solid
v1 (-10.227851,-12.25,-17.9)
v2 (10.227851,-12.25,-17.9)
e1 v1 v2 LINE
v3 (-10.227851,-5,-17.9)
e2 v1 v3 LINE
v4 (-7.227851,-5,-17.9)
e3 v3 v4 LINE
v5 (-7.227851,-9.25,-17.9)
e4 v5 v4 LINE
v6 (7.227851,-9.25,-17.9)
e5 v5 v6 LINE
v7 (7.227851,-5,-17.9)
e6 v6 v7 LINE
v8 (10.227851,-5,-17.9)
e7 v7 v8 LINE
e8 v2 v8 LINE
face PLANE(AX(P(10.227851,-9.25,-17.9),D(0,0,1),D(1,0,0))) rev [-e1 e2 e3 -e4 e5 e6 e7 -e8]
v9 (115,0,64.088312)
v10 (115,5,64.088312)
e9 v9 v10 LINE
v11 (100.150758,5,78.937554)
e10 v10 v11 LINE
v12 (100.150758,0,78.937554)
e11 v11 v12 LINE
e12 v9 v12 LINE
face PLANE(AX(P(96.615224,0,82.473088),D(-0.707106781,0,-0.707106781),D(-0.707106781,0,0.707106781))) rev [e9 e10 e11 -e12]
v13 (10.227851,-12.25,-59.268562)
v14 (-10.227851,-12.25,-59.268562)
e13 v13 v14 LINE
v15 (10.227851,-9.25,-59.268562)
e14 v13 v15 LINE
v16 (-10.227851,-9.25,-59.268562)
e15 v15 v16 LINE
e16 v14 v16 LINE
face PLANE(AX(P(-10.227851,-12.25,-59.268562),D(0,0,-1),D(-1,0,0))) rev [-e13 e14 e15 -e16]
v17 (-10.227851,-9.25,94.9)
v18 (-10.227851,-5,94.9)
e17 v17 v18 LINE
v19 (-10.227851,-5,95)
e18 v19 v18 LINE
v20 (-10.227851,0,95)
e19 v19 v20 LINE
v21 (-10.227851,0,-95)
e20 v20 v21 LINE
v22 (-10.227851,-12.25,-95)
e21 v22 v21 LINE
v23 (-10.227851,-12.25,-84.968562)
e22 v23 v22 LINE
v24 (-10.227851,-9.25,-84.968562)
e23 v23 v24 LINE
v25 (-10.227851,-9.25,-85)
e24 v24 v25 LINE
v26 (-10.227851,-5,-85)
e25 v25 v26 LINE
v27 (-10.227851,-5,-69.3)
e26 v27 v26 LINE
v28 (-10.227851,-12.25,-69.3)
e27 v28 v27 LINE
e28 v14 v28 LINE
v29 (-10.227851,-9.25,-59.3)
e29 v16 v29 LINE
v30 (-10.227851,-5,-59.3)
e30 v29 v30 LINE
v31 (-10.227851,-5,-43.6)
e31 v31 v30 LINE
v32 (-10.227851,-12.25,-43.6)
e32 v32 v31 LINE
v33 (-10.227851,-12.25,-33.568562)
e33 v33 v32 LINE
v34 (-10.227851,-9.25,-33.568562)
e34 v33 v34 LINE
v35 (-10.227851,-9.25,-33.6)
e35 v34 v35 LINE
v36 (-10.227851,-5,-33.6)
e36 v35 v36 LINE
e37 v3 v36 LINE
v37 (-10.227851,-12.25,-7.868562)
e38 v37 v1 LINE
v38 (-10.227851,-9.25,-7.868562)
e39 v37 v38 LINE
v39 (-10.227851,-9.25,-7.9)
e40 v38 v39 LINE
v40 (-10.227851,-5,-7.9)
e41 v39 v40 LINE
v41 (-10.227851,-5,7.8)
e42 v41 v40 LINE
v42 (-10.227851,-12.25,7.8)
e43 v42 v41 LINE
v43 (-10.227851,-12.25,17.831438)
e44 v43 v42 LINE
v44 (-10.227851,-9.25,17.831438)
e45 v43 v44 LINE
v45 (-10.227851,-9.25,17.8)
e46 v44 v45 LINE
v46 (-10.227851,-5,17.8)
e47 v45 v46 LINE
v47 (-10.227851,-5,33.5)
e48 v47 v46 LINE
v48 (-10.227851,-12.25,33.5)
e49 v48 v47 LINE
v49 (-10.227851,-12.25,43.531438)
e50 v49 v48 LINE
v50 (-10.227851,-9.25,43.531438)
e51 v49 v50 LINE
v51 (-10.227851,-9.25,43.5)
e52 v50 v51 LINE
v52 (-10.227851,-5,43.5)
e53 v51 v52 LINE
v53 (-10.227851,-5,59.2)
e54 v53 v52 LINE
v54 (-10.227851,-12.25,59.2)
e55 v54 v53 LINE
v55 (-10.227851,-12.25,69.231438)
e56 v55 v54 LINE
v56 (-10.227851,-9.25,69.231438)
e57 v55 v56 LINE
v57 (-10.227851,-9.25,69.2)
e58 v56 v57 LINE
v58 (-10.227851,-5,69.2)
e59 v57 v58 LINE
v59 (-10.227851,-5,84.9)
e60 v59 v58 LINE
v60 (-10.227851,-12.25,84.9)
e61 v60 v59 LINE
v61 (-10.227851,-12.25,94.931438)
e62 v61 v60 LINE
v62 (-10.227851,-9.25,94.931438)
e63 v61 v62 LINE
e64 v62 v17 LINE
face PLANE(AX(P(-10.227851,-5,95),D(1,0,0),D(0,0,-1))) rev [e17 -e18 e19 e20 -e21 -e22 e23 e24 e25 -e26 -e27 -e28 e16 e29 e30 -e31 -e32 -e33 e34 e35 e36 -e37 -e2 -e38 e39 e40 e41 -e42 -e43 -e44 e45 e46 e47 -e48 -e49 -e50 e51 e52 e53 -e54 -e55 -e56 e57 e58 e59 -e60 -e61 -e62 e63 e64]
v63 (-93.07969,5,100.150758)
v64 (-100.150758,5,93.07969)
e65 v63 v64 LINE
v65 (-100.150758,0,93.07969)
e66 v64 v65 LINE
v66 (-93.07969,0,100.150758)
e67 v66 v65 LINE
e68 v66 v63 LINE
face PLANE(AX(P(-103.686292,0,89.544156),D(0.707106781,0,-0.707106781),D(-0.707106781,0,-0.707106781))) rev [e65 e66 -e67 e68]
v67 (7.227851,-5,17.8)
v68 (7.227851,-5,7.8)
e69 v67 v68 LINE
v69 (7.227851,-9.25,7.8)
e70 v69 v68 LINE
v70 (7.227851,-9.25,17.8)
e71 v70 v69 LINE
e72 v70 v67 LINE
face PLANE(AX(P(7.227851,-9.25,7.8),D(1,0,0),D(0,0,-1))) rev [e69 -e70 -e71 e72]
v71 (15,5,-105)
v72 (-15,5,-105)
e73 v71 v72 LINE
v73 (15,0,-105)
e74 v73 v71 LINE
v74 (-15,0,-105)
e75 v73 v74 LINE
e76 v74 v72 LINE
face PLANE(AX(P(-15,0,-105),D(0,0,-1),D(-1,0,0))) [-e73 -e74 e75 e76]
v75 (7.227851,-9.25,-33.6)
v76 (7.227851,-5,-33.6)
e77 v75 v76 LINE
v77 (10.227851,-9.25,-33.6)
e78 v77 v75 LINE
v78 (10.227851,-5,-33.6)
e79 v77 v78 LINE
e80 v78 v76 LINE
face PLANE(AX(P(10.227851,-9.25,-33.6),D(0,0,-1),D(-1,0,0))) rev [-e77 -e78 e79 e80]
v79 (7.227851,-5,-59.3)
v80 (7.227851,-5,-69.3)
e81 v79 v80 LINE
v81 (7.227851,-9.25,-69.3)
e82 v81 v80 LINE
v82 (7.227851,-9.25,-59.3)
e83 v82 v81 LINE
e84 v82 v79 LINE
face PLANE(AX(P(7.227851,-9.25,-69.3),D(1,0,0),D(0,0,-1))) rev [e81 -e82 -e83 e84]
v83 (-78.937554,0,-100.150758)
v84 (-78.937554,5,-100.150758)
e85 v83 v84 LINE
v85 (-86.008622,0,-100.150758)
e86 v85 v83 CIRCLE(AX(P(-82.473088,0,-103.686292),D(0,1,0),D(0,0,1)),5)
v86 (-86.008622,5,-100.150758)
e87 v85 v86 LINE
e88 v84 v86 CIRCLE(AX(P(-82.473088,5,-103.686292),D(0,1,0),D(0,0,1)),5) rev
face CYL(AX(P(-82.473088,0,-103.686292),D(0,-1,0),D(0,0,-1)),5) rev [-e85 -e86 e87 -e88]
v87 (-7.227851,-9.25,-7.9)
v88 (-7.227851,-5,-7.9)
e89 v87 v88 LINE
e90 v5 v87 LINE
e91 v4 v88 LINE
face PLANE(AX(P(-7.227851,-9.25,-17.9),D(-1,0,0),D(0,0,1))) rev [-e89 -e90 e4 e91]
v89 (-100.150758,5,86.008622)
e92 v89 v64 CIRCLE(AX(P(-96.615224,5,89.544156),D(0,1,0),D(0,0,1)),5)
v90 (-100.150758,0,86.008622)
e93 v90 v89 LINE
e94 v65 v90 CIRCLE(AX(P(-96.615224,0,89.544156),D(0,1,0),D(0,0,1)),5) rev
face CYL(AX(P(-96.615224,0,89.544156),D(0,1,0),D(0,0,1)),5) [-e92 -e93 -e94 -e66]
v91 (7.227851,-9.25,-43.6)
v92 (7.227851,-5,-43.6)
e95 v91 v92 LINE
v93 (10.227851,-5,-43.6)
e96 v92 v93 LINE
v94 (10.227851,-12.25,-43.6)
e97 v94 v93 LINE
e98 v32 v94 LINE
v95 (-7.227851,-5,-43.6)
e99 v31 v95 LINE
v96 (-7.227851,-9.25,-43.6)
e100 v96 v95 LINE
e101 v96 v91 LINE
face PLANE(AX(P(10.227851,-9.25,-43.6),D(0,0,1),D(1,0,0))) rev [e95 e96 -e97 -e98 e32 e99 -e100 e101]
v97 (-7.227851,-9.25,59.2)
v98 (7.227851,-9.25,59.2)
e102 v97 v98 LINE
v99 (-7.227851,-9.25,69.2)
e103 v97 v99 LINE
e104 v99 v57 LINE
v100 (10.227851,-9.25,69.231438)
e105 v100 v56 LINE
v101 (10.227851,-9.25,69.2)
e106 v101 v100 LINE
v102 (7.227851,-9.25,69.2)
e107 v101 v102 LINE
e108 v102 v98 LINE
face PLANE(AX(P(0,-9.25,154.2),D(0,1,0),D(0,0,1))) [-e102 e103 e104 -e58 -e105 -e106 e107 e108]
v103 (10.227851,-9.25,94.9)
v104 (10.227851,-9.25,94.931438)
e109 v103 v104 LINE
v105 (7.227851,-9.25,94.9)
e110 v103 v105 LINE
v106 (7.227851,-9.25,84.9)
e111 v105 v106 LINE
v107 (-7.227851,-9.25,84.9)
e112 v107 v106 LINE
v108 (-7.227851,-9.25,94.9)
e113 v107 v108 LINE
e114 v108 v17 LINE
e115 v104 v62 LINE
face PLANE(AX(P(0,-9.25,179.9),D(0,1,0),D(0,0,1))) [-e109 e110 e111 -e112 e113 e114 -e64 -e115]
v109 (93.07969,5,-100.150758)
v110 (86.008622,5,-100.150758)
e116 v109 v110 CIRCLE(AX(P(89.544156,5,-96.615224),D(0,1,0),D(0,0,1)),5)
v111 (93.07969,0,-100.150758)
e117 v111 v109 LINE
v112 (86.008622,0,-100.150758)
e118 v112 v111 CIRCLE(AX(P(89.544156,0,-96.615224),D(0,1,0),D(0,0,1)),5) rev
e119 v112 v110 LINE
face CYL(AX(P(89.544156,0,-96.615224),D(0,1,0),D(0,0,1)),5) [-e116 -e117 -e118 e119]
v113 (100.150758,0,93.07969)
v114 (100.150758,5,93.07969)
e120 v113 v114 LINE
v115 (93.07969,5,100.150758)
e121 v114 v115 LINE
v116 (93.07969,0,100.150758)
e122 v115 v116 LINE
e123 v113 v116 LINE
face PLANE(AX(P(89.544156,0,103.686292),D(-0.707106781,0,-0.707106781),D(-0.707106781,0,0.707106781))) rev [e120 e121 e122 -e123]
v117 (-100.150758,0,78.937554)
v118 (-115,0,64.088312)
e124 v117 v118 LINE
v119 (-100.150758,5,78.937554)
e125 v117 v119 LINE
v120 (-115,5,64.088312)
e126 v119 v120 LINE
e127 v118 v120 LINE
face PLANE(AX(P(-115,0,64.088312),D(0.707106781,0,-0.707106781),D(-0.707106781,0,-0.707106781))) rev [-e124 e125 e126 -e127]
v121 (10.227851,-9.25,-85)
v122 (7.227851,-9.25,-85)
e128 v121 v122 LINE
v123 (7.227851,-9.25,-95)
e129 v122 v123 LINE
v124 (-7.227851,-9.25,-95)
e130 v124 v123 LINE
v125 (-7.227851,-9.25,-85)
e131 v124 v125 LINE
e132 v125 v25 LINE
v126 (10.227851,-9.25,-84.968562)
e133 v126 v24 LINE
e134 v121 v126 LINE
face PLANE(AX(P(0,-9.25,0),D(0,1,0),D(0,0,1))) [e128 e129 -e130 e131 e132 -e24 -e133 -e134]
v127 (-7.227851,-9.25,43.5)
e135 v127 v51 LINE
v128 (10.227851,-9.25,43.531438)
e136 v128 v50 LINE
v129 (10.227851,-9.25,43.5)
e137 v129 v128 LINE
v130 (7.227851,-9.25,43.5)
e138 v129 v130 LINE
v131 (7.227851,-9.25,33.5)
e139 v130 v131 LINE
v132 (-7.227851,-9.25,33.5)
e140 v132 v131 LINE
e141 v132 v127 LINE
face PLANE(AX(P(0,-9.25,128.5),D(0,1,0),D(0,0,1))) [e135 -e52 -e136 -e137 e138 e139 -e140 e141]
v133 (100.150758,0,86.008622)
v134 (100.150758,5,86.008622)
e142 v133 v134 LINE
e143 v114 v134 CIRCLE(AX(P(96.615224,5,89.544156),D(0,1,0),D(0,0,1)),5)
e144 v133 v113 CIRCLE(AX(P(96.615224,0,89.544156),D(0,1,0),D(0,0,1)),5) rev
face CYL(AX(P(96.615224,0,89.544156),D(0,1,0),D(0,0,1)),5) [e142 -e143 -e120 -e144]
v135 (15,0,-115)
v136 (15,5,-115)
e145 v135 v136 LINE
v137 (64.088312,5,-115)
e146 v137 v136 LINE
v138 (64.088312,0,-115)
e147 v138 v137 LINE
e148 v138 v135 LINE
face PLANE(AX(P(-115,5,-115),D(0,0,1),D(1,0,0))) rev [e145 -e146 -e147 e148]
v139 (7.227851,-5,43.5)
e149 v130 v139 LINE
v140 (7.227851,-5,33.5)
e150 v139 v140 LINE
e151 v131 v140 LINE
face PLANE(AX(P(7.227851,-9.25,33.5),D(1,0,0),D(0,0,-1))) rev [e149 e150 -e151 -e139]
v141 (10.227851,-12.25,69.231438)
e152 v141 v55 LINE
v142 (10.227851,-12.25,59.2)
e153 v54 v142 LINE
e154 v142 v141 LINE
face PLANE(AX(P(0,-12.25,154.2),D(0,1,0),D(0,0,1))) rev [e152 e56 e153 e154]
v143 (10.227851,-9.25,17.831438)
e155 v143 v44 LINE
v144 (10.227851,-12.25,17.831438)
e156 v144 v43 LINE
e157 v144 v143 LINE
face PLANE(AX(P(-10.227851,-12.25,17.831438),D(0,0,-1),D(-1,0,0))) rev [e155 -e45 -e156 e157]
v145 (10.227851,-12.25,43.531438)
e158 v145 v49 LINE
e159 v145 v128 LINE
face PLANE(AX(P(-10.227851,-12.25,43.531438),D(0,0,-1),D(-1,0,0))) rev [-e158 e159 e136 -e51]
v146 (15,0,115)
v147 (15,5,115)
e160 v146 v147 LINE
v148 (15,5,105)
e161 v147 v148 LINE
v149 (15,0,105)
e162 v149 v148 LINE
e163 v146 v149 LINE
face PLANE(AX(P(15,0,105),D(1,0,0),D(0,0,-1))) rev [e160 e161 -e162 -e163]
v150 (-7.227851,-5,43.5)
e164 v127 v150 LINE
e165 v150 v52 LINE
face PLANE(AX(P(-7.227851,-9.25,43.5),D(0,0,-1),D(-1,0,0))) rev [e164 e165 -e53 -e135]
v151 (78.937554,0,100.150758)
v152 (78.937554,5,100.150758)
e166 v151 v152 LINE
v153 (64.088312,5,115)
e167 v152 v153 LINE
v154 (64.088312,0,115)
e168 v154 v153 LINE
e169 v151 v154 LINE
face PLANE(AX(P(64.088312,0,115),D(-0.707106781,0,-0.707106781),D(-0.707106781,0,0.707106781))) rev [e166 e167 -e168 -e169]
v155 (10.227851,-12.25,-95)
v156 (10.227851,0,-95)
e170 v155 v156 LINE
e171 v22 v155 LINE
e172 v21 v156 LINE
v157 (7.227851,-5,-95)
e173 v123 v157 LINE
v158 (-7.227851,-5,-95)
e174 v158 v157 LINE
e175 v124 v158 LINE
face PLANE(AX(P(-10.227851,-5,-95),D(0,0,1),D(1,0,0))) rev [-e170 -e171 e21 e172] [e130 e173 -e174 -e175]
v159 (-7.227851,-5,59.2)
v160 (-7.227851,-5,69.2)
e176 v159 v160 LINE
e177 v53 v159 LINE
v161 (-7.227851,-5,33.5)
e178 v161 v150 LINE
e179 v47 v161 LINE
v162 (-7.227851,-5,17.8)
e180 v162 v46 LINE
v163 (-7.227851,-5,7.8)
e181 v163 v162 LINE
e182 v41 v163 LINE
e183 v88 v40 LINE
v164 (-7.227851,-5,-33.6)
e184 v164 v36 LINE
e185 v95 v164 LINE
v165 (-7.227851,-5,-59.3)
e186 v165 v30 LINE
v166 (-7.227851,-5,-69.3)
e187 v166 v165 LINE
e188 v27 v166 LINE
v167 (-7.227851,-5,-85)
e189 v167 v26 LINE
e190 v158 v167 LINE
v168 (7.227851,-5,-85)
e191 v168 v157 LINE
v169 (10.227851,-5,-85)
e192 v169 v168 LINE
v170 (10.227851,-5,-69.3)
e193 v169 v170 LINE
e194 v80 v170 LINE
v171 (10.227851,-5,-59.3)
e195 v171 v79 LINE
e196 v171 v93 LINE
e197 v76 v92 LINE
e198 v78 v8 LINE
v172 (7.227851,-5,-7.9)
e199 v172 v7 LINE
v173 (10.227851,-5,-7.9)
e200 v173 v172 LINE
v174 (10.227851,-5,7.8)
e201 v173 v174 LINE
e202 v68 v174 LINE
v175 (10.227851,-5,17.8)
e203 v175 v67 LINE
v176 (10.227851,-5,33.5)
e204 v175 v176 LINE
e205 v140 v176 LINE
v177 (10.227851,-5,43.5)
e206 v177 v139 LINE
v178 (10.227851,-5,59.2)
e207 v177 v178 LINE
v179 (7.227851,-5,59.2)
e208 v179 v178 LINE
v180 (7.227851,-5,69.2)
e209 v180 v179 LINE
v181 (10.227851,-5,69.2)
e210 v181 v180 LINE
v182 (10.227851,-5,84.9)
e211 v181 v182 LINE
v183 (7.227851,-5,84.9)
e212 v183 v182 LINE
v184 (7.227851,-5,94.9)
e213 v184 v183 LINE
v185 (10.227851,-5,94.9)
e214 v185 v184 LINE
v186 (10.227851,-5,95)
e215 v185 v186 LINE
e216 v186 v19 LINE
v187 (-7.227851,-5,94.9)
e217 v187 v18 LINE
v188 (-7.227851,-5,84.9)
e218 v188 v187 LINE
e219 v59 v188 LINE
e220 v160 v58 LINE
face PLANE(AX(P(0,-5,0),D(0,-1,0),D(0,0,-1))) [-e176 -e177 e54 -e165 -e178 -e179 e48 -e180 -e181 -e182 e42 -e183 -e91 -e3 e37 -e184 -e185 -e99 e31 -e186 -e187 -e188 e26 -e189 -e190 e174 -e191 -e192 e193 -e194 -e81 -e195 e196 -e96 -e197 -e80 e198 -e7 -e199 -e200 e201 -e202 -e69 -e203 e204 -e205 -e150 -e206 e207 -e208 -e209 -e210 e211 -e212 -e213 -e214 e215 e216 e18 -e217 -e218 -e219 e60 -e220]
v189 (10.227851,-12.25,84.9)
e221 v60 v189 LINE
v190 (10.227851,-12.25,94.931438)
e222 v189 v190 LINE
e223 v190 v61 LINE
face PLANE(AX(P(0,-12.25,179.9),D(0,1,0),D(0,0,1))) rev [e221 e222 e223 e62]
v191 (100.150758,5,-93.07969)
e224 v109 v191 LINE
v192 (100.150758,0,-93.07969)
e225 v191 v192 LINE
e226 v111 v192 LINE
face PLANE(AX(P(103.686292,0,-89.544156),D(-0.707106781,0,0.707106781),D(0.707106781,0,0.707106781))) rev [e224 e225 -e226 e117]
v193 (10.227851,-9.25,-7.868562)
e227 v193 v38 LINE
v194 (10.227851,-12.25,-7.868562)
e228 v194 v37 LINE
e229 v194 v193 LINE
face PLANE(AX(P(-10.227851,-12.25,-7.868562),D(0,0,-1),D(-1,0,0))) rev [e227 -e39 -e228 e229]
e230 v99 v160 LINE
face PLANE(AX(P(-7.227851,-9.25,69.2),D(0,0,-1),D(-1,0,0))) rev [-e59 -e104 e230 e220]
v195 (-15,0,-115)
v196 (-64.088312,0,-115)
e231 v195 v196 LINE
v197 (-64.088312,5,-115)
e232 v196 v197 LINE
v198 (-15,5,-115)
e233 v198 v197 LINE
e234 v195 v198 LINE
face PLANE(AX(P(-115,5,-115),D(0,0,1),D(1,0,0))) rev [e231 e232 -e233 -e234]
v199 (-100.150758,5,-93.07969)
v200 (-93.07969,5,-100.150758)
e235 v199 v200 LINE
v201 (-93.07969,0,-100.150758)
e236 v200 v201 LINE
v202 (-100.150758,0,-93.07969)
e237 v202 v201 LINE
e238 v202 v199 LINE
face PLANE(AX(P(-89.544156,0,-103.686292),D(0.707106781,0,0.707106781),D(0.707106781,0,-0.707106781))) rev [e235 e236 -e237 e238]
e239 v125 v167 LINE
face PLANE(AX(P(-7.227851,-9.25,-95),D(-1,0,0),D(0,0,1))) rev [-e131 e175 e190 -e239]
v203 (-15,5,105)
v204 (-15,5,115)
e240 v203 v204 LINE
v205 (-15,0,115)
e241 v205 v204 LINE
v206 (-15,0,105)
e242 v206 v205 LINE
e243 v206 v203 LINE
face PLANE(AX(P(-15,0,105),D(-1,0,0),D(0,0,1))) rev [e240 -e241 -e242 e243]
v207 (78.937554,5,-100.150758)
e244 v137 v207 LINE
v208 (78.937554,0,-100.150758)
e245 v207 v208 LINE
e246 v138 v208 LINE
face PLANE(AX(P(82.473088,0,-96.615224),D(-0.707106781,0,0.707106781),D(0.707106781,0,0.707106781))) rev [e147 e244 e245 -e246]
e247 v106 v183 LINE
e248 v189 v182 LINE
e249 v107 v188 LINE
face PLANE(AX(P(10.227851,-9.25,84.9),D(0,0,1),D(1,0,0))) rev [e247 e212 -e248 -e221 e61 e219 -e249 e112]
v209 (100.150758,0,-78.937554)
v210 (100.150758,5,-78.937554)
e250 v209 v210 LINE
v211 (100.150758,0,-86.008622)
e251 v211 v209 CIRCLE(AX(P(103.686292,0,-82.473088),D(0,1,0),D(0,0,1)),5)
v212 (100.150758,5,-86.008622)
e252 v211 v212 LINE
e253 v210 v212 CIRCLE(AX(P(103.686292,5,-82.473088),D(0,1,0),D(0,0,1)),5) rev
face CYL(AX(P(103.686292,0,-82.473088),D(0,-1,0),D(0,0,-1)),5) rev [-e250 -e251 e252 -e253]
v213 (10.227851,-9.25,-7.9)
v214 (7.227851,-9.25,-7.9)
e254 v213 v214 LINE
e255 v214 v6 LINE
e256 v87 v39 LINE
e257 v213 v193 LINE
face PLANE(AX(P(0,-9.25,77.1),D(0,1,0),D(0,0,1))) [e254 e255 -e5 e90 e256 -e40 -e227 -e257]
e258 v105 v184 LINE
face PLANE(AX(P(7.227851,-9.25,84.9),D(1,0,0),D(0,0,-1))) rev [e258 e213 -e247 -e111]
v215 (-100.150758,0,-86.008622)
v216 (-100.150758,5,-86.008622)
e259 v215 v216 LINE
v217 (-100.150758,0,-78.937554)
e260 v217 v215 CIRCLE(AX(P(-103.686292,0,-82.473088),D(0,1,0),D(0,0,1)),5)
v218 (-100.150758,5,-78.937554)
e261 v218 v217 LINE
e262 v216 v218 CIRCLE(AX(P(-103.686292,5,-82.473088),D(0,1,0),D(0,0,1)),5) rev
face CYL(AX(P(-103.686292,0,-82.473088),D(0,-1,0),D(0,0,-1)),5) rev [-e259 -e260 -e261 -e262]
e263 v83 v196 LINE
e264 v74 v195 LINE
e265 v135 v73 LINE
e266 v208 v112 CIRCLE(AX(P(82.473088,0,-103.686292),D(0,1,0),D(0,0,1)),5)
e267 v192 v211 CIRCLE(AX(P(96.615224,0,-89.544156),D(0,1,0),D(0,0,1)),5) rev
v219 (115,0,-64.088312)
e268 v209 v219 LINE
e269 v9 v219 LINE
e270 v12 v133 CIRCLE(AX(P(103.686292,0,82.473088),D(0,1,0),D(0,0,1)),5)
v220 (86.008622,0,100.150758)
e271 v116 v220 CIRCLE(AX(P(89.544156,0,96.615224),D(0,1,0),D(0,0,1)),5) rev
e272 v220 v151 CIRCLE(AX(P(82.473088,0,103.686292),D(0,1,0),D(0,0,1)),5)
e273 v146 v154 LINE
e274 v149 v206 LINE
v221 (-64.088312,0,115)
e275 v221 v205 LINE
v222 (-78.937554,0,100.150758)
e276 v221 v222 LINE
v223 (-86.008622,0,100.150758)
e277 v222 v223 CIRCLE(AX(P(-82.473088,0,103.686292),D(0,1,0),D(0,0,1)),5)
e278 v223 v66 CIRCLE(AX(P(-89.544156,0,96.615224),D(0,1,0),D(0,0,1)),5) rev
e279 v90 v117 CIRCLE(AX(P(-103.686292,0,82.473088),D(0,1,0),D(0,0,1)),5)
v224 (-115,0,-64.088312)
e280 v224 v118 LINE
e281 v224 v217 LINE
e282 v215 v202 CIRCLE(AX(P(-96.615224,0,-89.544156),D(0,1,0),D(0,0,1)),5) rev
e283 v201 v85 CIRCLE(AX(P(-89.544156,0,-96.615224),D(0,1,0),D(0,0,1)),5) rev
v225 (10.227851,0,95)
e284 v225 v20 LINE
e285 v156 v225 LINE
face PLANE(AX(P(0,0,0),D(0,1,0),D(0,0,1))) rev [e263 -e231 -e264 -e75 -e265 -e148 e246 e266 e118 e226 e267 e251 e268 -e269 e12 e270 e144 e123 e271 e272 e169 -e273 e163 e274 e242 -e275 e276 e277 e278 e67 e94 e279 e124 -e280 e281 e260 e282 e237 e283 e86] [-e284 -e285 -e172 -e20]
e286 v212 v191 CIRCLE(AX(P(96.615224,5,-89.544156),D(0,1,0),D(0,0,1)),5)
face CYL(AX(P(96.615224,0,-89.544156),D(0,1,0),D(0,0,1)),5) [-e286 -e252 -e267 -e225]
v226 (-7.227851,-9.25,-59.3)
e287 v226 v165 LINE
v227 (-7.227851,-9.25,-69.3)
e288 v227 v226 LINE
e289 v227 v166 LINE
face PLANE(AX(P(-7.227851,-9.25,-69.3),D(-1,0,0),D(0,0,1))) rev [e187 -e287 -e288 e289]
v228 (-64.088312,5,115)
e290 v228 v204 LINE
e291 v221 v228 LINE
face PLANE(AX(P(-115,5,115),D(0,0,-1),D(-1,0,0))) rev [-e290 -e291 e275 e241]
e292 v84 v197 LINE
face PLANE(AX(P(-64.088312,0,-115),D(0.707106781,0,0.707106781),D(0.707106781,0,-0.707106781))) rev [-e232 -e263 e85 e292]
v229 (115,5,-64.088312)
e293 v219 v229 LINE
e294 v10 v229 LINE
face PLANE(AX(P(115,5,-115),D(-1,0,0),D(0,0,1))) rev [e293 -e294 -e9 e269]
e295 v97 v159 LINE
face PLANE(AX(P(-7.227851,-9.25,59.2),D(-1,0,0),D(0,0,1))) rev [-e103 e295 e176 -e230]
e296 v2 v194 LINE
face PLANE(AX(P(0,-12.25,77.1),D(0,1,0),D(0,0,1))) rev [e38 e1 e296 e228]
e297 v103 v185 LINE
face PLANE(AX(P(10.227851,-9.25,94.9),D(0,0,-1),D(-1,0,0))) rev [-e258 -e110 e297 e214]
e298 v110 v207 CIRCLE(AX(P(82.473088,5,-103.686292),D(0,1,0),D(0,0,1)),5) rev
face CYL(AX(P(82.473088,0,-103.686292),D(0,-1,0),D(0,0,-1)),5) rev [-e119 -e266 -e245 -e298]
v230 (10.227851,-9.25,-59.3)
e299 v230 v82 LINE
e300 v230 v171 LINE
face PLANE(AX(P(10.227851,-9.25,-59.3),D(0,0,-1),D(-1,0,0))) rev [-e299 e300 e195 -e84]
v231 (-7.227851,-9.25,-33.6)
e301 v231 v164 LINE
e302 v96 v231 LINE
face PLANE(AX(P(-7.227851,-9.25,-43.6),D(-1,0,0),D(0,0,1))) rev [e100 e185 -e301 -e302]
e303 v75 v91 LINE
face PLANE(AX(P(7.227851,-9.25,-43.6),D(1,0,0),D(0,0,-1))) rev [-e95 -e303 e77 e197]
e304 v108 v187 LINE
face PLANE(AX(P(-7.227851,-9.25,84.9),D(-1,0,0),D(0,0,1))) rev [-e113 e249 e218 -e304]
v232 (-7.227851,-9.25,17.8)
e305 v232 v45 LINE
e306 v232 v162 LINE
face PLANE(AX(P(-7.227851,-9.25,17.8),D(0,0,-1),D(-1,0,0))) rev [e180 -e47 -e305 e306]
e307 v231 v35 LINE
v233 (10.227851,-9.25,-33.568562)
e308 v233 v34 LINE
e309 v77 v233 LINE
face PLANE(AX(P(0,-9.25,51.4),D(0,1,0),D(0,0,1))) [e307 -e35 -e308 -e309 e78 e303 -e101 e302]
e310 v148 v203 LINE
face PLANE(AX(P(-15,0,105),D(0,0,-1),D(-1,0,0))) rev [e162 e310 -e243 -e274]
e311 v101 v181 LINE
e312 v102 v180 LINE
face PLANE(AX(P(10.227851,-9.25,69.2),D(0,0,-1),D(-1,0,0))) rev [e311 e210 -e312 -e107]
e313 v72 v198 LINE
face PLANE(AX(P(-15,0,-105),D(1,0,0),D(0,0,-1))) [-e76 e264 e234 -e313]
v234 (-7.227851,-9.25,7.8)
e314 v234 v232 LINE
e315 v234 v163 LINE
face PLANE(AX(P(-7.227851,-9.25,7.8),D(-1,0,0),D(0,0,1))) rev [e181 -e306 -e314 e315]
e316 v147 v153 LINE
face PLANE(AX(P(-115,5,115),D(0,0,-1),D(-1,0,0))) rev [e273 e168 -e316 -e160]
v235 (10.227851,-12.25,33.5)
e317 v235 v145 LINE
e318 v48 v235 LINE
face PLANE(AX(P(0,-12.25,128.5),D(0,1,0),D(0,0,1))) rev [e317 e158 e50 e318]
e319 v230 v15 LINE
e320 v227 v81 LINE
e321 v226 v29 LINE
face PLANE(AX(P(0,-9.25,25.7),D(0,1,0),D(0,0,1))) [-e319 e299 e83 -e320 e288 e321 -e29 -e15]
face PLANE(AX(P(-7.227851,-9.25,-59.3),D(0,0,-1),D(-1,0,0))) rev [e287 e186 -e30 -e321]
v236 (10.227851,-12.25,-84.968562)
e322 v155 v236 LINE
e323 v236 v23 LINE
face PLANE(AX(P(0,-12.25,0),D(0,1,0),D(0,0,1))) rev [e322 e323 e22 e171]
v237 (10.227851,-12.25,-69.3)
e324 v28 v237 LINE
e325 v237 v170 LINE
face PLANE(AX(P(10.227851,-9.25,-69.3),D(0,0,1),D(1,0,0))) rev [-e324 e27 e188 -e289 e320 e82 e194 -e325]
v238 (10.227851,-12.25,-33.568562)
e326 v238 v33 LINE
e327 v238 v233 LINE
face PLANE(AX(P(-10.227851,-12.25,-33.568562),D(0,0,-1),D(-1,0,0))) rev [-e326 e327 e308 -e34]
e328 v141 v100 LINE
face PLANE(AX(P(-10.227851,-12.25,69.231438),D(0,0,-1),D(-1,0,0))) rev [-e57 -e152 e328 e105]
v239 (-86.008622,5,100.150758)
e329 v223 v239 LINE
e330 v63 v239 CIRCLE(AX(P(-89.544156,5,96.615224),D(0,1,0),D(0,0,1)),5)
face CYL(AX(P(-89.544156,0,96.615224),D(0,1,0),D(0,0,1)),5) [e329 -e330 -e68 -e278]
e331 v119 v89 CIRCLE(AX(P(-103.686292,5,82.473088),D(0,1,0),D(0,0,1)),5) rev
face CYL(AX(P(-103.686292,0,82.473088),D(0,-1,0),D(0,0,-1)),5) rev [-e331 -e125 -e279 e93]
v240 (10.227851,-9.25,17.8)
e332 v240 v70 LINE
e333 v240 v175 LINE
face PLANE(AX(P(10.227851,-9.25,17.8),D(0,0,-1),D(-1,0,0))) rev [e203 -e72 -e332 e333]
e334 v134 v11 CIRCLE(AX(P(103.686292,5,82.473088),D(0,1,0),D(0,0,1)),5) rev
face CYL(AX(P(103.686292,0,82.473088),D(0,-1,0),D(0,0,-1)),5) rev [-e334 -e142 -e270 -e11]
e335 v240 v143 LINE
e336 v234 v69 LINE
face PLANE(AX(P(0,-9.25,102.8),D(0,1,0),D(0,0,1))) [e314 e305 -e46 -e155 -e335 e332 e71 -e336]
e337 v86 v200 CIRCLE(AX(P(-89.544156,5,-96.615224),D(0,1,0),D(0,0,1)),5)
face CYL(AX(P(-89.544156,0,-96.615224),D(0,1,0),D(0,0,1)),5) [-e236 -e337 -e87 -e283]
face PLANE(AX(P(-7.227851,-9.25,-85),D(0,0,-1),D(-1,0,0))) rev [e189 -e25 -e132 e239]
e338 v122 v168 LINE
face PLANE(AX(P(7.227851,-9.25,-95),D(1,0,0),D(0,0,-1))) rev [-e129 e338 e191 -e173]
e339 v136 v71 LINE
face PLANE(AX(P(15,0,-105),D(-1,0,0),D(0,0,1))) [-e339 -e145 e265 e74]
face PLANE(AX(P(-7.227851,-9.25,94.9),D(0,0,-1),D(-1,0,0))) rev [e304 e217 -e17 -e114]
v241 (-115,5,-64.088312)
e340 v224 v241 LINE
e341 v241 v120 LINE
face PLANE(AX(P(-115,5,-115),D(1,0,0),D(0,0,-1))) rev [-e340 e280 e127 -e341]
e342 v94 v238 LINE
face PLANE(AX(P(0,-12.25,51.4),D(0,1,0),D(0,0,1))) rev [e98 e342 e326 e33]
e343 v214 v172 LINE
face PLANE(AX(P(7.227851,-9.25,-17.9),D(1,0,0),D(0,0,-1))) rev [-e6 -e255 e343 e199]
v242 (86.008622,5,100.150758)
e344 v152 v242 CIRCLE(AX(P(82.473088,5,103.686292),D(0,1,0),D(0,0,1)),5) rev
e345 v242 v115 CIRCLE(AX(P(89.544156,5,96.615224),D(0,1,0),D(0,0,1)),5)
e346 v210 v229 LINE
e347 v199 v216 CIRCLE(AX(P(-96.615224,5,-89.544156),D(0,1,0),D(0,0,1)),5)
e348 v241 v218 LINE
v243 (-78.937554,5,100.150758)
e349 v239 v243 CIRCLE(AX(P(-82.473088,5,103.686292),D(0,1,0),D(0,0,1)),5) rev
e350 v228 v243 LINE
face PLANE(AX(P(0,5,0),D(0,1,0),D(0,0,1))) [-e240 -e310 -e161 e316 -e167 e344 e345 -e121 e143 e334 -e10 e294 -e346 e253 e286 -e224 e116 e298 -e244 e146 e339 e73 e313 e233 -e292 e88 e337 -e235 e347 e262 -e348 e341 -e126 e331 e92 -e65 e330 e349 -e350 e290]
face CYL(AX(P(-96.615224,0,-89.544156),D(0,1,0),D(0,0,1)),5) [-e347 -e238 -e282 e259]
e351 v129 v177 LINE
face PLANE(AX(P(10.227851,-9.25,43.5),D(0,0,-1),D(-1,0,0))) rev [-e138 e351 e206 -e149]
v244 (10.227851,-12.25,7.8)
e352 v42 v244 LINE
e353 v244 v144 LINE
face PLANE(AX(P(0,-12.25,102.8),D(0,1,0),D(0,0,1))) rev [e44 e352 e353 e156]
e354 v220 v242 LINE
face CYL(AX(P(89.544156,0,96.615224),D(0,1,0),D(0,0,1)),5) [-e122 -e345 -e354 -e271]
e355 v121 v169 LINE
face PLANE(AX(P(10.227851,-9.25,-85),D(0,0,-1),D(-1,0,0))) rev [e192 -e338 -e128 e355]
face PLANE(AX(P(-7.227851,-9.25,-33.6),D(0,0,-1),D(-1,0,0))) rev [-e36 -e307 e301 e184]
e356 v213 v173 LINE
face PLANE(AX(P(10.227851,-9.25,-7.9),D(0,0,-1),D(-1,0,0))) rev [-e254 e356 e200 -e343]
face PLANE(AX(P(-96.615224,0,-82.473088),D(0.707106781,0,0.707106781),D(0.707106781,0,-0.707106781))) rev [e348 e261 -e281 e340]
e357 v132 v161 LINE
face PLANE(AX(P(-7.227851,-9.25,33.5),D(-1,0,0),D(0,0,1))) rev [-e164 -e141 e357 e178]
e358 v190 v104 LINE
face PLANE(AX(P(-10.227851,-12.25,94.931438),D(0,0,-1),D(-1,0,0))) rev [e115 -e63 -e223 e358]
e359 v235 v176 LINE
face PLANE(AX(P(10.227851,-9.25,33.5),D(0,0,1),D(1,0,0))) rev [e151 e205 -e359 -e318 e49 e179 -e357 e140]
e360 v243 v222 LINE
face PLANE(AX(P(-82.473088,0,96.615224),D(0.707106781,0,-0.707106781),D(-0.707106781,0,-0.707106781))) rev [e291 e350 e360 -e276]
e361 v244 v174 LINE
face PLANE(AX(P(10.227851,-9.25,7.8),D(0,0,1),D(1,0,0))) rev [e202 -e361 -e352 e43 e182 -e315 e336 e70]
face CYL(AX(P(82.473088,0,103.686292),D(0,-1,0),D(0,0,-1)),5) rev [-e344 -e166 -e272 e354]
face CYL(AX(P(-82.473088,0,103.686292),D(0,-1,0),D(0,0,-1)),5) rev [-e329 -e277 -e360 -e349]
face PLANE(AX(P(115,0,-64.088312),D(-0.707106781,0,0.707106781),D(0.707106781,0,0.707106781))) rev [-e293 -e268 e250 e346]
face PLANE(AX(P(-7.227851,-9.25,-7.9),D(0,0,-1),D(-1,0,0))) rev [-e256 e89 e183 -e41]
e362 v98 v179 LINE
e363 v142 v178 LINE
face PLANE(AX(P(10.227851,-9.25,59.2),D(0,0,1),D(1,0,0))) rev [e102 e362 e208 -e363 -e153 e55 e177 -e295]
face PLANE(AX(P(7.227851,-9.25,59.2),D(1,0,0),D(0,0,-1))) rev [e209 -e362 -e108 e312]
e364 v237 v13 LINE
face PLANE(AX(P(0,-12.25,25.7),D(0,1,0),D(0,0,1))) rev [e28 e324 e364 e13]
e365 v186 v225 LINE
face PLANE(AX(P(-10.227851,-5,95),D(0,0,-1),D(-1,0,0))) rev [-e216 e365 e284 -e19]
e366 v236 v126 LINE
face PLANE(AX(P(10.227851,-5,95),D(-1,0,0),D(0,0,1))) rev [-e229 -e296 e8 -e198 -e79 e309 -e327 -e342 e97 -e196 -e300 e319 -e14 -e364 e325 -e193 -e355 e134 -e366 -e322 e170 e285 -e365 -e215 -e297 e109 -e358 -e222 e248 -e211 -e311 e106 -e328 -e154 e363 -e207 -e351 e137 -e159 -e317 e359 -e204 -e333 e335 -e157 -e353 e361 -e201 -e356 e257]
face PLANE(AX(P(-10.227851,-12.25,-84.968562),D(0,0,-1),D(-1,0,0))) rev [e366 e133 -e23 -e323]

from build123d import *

# Parameters (mm, degrees)
SZKIC1_W                        = 230
SZKIC1_H                        = 230
DODANIE_WYCI_GNI_CIE1_DEPTH     = 5
WYTNIJ_WYCI_GNI_CIE1_DEPTH      = 163.711400953
ZAOKR_GLENIE2_R                 = 5
SZYK_KO_OWY1_COUNT              = 4
ZAOKR_GLENIE2_OF_SZYK_KO_OWY1_R = 5
SZKIC3_W                        = 30
SZKIC3_H                        = 10
WYTNIJ_WYCI_GNI_CIE2_DEPTH      = 163.711400953
SZKIC4_W                        = 20.455701668
SZKIC4_H                        = 190
DODANIE_WYCI_GNI_CIE2_DEPTH     = 5
SZKIC5_W                        = 3
SZKIC5_H                        = 10
DODANIE_WYCI_GNI_CIE3_DEPTH     = 4.25
SZKIC6_W                        = 20.455701668
SZKIC6_H                        = 10.031438373
DODANIE_WYCI_GNI_CIE4_DEPTH     = 3
SZYK_LINIOWY1_COUNT             = 8
SZYK_LINIOWY1_PITCH             = 25.7


with BuildPart() as part:
    # Szkic1 → Dodanie-wyciągnięcie1 (new body)
    with BuildSketch(Plane(origin=(0, 0, 0), x_dir=(1, 0, 0), z_dir=(0, 1, 0))):
        Rectangle(SZKIC1_W, SZKIC1_H)
    extrude(amount=DODANIE_WYCI_GNI_CIE1_DEPTH)

    # Szkic2 → Wytnij-wyciągnięcie1 (cut, symmetric)
    with BuildSketch(Plane(origin=(0, 5, 0), x_dir=(1, 0, 0), z_dir=(0, 1, 0))):
        Polygon((-115, 115), (-64.088311755, 115), (-82.473088065, 96.615223689), (-89.544155877, 103.686291501), (-103.686291501, 89.544155877), (-96.615223689, 82.473088065), (-115, 64.088311755), align=None)
    wytnij_wyci_gni_cie1 = extrude(amount=WYTNIJ_WYCI_GNI_CIE1_DEPTH, both=True, mode=Mode.SUBTRACT)

    # Zaokrąglenie2
    zaokr_glenie2_edges = [part.edges().sort_by_distance(p)[0] for p in [
        (-82.473088065, 2.5, -96.615223689),
        (-96.615223689, 2.5, -82.473088065),
    ]]
    fillet(zaokr_glenie2_edges, radius=ZAOKR_GLENIE2_R)
    zaokr_glenie2_2_edges = [part.edges().sort_by_distance(p)[0] for p in [
        (-89.544155877, 2.5, -103.686291501),
        (-103.686291501, 2.5, -89.544155877),
    ]]
    fillet(zaokr_glenie2_2_edges, radius=ZAOKR_GLENIE2_R - 0.0001)  # a hair under: the kernel refuses the full size

    # Szyk kołowy1: Wytnij-wyciągnięcie1 ×4 about axis
    szyk_ko_owy1_axis = Axis((0, 0, 0), (0, 1, 0))
    for i in range(1, SZYK_KO_OWY1_COUNT):
        add(wytnij_wyci_gni_cie1.rotate(szyk_ko_owy1_axis, i * 360 / SZYK_KO_OWY1_COUNT), mode=Mode.SUBTRACT)

    # Zaokrąglenie2 of Szyk kołowy1
    zaokr_glenie2_of_szyk_ko_owy1_edges = [part.edges().sort_by_distance(p)[0] for p in [
        (-96.615223689, 2.5, 82.473088065),
        (-82.473088065, 2.5, 96.615223689),
        (82.473088065, 2.5, 96.615223689),
        (96.615223689, 2.5, 82.473088065),
        (96.615223689, 2.5, -82.473088065),
        (82.473088065, 2.5, -96.615223689),
    ]]
    fillet(zaokr_glenie2_of_szyk_ko_owy1_edges, radius=ZAOKR_GLENIE2_OF_SZYK_KO_OWY1_R)
    zaokr_glenie2_of_szyk_ko_owy1_2_edges = [part.edges().sort_by_distance(p)[0] for p in [
        (-103.686291501, 2.5, 89.544155877),
        (-89.544155877, 2.5, 103.686291501),
        (89.544155877, 2.5, 103.686291501),
        (103.686291501, 2.5, 89.544155877),
        (103.686291501, 2.5, -89.544155877),
        (89.544155877, 2.5, -103.686291501),
    ]]
    fillet(zaokr_glenie2_of_szyk_ko_owy1_2_edges, radius=ZAOKR_GLENIE2_OF_SZYK_KO_OWY1_R - 0.0001)  # a hair under: the kernel refuses the full size

    # Szkic3 → Wytnij-wyciągnięcie2 (cut, through all)
    with BuildSketch(Plane(origin=(0, 5, 0), x_dir=(1, 0, 0), z_dir=(0, 1, 0))):
        with Locations((0, -110)):
            Rectangle(SZKIC3_W, SZKIC3_H)
    wytnij_wyci_gni_cie2 = extrude(amount=-WYTNIJ_WYCI_GNI_CIE2_DEPTH, mode=Mode.SUBTRACT)

    # Lustro1: Wytnij-wyciągnięcie2 across plane
    add(wytnij_wyci_gni_cie2.mirror(Plane.XY), mode=Mode.SUBTRACT)

    # Szkic4 → Dodanie-wyciągnięcie2 (add)
    with BuildSketch(Plane.XZ):
        Rectangle(SZKIC4_W, SZKIC4_H)
    extrude(amount=DODANIE_WYCI_GNI_CIE2_DEPTH)

    # Szkic5 → Dodanie-wyciągnięcie3 (add)
    with BuildSketch(Plane.XZ.offset(5)):
        with Locations((8.727850834, -90)):
            Rectangle(SZKIC5_W, SZKIC5_H)
        with Locations((-8.727850834, -90)):
            Rectangle(SZKIC5_W, SZKIC5_H)
    dodanie_wyci_gni_cie3 = extrude(amount=DODANIE_WYCI_GNI_CIE3_DEPTH)

    # Szkic6 → Dodanie-wyciągnięcie4 (add)
    with BuildSketch(Plane.XZ.offset(9.25)):
        with Locations((0, -89.984280813)):
            Rectangle(SZKIC6_W, SZKIC6_H)
    dodanie_wyci_gni_cie4 = extrude(amount=DODANIE_WYCI_GNI_CIE4_DEPTH)

    # Szyk liniowy1: Dodanie-wyciągnięcie3, Dodanie-wyciągnięcie4 ×8
    with Locations(*[(0, 0, i * SZYK_LINIOWY1_PITCH) for i in range(1, SZYK_LINIOWY1_COUNT)]):
        add(dodanie_wyci_gni_cie3)
        add(dodanie_wyci_gni_cie4)


solid = part.part
